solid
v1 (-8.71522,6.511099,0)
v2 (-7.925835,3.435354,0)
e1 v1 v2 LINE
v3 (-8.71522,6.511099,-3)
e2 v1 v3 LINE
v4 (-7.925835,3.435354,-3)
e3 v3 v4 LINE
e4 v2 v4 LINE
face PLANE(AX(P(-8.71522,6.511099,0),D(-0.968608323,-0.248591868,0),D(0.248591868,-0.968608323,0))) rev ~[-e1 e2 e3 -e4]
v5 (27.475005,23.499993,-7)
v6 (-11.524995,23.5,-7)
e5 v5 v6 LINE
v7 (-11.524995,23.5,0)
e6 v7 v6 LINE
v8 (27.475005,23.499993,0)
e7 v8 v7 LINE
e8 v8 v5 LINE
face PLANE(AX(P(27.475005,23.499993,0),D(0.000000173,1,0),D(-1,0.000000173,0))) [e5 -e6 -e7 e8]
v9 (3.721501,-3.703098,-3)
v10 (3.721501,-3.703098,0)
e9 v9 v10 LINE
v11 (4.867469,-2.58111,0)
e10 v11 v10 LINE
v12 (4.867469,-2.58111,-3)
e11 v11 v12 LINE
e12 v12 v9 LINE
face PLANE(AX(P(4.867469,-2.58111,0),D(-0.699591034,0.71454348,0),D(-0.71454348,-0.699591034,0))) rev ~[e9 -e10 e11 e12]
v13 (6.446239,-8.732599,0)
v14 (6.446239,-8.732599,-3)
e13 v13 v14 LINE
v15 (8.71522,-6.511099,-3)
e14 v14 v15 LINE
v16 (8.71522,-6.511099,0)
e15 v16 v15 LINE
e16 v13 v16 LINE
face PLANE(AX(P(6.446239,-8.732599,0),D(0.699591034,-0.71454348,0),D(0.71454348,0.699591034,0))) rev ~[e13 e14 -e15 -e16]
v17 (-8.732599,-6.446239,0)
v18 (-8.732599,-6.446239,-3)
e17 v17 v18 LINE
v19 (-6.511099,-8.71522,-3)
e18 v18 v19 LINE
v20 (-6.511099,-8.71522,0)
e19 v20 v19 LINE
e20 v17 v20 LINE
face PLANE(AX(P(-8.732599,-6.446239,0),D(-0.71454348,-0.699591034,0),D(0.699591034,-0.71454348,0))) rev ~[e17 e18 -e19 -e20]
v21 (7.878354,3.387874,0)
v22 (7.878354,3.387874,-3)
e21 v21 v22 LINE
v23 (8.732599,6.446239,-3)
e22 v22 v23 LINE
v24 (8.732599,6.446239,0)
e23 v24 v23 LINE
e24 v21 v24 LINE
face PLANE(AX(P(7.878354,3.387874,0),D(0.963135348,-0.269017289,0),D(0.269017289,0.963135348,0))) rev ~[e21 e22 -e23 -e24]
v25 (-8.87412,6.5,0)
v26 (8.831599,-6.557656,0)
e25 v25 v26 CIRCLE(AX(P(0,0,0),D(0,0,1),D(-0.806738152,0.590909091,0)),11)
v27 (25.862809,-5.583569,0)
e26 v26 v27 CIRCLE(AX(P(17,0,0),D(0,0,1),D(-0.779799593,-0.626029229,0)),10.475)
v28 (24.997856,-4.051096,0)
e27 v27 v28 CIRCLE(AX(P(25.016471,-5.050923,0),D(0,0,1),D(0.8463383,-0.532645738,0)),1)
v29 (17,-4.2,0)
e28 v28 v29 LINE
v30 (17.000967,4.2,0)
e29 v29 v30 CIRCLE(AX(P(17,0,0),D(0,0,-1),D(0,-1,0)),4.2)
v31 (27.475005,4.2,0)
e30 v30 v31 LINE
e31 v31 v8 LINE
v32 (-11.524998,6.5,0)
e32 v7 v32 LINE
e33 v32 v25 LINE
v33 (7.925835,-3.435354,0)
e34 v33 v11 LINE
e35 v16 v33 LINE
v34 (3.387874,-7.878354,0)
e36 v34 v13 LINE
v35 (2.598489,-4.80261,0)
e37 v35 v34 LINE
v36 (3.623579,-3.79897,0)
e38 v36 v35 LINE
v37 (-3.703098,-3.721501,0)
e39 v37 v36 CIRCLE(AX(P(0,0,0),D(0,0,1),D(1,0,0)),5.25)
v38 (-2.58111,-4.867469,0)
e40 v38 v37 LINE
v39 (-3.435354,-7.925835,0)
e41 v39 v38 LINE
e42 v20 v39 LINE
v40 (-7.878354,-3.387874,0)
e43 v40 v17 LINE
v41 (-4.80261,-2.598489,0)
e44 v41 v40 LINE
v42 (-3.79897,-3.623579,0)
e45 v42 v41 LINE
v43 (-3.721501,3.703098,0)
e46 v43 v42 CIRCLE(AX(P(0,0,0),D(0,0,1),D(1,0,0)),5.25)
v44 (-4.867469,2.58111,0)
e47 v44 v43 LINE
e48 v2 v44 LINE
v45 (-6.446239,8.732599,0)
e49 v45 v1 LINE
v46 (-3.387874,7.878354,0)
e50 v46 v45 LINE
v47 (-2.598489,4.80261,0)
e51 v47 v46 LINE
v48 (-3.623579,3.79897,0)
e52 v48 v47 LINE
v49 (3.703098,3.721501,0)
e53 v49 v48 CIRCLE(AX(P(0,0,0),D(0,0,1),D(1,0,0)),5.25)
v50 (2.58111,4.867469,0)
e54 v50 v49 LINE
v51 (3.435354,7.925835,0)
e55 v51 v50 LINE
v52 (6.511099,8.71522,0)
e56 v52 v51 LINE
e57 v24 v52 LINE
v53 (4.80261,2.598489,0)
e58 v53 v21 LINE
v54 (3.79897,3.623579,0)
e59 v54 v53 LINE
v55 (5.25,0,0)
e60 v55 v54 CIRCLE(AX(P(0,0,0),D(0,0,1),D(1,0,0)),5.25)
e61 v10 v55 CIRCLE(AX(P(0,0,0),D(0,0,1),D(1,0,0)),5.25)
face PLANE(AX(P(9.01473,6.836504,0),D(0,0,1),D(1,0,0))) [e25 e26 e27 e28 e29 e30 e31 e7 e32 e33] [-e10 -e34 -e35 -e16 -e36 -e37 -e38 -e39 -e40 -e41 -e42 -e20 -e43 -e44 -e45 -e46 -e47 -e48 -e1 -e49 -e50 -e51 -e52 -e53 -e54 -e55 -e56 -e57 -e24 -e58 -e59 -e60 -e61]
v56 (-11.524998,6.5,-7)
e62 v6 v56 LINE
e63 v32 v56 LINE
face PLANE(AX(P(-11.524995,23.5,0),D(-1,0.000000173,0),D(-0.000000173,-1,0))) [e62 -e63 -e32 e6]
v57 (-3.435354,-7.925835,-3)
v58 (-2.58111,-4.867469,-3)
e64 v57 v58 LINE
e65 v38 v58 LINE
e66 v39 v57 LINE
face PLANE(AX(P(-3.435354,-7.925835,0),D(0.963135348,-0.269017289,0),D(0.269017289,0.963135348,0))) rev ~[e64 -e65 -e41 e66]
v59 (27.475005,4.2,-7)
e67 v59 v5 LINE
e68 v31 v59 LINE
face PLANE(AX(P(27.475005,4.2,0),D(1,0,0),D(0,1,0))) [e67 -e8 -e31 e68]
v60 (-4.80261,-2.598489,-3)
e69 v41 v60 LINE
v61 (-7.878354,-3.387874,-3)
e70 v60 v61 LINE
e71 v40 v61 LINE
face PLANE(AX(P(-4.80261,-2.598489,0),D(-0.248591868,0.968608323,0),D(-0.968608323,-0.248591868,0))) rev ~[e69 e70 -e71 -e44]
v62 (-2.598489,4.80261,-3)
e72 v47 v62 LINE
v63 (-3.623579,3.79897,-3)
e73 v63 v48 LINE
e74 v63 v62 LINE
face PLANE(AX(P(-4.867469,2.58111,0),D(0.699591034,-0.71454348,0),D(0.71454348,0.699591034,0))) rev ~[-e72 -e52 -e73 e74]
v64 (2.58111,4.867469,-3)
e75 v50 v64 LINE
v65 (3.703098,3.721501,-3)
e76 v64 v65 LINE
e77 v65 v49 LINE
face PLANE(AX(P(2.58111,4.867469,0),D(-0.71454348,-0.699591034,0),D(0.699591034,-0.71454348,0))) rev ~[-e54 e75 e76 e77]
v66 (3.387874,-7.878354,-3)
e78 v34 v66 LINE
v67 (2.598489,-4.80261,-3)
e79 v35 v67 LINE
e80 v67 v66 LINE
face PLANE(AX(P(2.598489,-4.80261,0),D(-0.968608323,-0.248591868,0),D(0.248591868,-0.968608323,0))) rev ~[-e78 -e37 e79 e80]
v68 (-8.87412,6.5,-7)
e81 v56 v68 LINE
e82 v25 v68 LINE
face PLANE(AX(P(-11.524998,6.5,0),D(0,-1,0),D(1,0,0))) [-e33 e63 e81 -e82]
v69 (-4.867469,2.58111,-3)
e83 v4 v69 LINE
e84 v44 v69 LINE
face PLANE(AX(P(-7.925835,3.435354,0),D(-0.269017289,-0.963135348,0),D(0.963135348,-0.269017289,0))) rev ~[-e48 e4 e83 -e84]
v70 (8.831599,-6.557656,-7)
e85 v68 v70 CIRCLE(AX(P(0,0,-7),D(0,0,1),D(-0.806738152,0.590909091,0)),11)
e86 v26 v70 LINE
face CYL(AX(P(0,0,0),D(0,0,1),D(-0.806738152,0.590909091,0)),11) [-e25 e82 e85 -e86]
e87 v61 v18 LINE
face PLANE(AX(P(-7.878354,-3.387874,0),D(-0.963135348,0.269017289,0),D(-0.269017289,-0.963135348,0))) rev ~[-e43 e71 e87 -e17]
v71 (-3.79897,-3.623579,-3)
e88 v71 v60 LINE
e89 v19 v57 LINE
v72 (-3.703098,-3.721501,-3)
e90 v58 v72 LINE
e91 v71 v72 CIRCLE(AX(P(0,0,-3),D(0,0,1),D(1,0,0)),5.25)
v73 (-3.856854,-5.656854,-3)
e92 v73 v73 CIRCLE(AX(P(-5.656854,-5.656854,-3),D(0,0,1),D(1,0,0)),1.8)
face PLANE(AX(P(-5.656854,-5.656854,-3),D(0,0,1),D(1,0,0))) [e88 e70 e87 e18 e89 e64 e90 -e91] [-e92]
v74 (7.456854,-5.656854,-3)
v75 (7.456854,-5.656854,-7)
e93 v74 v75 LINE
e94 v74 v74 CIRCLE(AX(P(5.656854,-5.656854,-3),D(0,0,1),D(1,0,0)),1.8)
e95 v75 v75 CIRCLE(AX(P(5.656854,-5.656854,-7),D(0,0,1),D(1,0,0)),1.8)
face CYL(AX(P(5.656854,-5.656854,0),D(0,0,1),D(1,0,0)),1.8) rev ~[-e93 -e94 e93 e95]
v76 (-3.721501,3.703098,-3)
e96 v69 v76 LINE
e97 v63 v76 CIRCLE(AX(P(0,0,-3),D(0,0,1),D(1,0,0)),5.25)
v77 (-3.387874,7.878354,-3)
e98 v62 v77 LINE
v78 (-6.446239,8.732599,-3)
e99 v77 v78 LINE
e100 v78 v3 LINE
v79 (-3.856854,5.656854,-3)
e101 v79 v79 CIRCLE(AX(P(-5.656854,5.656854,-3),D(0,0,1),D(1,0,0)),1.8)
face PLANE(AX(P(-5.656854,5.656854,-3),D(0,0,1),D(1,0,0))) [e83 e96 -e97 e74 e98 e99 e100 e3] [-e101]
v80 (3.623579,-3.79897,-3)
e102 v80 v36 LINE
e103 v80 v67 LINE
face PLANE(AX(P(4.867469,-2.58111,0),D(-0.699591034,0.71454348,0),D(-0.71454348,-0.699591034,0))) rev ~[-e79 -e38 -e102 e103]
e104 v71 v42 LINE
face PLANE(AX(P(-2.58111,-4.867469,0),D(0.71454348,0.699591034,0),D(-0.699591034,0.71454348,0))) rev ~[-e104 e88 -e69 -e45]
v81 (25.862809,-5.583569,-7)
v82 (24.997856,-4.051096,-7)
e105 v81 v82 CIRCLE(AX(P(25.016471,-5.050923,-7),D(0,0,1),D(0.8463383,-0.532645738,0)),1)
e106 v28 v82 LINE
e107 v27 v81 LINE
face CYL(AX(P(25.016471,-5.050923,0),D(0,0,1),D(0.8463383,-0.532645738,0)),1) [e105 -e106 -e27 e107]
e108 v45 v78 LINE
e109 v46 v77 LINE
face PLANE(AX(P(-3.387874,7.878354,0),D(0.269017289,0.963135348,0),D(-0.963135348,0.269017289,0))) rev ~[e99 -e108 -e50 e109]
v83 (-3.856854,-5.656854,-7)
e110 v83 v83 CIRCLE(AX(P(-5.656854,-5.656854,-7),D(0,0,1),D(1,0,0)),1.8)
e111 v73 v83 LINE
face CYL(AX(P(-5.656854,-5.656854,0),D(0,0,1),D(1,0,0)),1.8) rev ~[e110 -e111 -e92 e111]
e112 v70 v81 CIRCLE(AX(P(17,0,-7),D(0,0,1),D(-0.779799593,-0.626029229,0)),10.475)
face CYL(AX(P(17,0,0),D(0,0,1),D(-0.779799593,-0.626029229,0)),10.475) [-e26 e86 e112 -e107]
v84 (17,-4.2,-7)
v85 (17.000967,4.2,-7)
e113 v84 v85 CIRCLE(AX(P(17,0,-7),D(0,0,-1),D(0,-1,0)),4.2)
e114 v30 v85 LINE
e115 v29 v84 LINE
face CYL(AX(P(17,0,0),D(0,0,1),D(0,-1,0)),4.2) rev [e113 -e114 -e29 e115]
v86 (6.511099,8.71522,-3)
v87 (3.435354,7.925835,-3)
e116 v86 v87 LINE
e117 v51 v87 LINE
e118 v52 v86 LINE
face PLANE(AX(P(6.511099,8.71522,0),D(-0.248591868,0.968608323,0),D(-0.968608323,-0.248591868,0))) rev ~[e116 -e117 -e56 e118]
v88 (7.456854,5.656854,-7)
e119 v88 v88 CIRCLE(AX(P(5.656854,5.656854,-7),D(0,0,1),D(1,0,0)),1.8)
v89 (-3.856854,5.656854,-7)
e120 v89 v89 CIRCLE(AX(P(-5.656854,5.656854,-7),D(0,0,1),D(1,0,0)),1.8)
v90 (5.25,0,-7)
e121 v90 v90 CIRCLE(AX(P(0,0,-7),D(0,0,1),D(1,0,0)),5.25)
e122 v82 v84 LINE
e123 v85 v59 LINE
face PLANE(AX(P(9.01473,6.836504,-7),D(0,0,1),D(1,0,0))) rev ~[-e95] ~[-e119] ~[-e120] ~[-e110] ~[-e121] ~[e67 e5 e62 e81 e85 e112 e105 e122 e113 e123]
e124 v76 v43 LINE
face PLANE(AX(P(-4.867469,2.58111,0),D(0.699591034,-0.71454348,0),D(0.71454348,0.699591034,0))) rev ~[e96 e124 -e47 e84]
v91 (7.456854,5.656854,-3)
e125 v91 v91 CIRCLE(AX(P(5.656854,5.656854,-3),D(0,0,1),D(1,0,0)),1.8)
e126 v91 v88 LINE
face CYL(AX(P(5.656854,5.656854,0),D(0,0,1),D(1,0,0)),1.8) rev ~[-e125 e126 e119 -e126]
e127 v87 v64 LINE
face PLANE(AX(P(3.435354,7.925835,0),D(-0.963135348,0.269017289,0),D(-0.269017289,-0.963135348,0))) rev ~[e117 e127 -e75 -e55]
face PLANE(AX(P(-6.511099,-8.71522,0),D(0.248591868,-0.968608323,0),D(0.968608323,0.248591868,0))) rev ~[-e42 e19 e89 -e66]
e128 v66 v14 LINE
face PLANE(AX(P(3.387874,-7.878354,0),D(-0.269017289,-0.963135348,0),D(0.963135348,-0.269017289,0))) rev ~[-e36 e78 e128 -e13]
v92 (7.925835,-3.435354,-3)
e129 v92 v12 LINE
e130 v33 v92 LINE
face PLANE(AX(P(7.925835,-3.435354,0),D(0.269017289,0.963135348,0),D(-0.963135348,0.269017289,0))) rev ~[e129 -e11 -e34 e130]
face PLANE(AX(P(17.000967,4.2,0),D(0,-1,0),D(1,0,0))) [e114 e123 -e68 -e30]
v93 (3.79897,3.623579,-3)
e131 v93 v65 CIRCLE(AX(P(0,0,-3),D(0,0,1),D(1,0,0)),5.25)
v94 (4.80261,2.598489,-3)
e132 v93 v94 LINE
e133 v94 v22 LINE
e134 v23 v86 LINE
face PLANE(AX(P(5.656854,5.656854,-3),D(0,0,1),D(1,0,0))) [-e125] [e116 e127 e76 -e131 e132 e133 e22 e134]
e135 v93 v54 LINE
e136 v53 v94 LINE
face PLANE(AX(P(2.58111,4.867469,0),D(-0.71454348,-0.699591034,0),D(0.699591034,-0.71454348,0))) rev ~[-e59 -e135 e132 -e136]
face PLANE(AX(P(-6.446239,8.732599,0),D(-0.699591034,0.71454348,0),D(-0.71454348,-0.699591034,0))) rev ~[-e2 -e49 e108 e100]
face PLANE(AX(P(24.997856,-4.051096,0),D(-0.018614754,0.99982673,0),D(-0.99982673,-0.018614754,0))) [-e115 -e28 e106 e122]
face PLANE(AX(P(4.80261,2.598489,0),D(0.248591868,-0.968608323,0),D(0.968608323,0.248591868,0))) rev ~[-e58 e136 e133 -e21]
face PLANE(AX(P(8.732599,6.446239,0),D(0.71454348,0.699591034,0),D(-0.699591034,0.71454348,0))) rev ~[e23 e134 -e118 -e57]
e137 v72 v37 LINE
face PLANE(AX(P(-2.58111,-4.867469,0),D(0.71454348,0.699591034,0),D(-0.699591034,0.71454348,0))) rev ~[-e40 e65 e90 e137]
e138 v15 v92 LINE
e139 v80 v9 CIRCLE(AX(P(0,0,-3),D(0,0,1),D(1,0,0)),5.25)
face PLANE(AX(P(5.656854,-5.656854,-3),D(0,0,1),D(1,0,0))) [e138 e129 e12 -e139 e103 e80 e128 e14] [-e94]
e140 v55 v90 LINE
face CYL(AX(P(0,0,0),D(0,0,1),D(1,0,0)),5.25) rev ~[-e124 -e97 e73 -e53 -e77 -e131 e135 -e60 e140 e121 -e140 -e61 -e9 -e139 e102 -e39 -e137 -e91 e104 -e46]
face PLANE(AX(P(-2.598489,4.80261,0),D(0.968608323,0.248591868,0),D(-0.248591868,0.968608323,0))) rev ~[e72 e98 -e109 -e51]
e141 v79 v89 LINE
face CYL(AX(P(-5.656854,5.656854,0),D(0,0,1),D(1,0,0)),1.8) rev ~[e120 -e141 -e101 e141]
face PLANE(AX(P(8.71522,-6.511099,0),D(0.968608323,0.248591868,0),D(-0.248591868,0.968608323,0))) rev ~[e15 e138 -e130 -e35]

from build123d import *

# Parameters (mm, degrees)
F0_R     = 1.8
F0_R_2   = 5.25
F1_DEPTH = 7
F3_DEPTH = 3


# Not quite as in the source:
# - a feature names something its author has since deleted; it is built from what else it names


with BuildPart() as f1:
    # F0 (on Top) → F1 (new body)
    with BuildSketch(Plane.XY):
        with BuildLine():
            ThreePointArc((17, -4.2), (12.8000000278, 0.000483474), (17.000966948, 4.1999998887))
            Line((17.000966948, 4.1999998887), (27.4750051144, 4.1999998887))
            Line((27.4750051144, 4.1999998887), (27.4750051144, 23.499993239))
            Line((27.4750051144, 23.499993239), (-11.5249948856, 23.5))
            Line((-11.5249948856, 23.5), (-11.5249978328, 6.5))
            Line((-11.5249978328, 6.5), (-8.8741196746, 6.5))
            ThreePointArc((-8.8741196746, 6.5), (-6.5288626997, -8.8529064068), (8.8315992647, -6.5576561688))
            ThreePointArc((8.8315992647, -6.5576561688), (17.5981324789, -10.4579090901), (25.8628092229, -5.5835685434))
            ThreePointArc((25.8628092229, -5.5835685434), (25.8873322976, -4.5593941021), (24.9978561691, -4.051096075))
            Line((24.9978561691, -4.051096075), (17, -4.2))
        make_face()
        with Locations((-5.6568542495, -5.6568542495)):
            Circle(F0_R, mode=Mode.SUBTRACT)
        with Locations((5.6568542495, -5.6568542495)):
            Circle(F0_R, mode=Mode.SUBTRACT)
        with Locations((-5.6568542495, 5.6568542495)):
            Circle(F0_R, mode=Mode.SUBTRACT)
        Circle(F0_R_2, mode=Mode.SUBTRACT)
        with Locations((5.6568542495, 5.6568542495)):
            Circle(F0_R, mode=Mode.SUBTRACT)
    extrude(amount=-F1_DEPTH)

    # F2 (on face) → F3 (cut)
    with BuildSketch(Plane.XY):
        Polygon((-7.8783541444, -3.3878739609), (-8.7325987676, -6.4462394487), (-6.5110988727, -8.7152197373), (-3.4353543546, -7.9258345381), (-2.5811097314, -4.8674690503), (-4.8026096263, -2.5984887617), align=None)
        Polygon((3.3878739609, -7.8783541444), (6.4462394487, -8.7325987676), (8.7152197373, -6.5110988727), (7.9258345381, -3.4353543546), (4.8674690503, -2.5811097314), (2.5984887617, -4.8026096263), align=None)
        Polygon((7.8783541444, 3.3878739609), (8.7325987676, 6.4462394487), (6.5110988727, 8.7152197373), (3.4353543546, 7.9258345381), (2.5811097314, 4.8674690503), (4.8026096263, 2.5984887617), align=None)
        Polygon((-3.3878739609, 7.8783541444), (-6.4462394487, 8.7325987676), (-8.7152197373, 6.5110988727), (-7.9258345381, 3.4353543546), (-4.8674690503, 2.5811097314), (-2.5984887617, 4.8026096263), align=None)
    extrude(amount=-F3_DEPTH, mode=Mode.SUBTRACT)


solid = f1.part
